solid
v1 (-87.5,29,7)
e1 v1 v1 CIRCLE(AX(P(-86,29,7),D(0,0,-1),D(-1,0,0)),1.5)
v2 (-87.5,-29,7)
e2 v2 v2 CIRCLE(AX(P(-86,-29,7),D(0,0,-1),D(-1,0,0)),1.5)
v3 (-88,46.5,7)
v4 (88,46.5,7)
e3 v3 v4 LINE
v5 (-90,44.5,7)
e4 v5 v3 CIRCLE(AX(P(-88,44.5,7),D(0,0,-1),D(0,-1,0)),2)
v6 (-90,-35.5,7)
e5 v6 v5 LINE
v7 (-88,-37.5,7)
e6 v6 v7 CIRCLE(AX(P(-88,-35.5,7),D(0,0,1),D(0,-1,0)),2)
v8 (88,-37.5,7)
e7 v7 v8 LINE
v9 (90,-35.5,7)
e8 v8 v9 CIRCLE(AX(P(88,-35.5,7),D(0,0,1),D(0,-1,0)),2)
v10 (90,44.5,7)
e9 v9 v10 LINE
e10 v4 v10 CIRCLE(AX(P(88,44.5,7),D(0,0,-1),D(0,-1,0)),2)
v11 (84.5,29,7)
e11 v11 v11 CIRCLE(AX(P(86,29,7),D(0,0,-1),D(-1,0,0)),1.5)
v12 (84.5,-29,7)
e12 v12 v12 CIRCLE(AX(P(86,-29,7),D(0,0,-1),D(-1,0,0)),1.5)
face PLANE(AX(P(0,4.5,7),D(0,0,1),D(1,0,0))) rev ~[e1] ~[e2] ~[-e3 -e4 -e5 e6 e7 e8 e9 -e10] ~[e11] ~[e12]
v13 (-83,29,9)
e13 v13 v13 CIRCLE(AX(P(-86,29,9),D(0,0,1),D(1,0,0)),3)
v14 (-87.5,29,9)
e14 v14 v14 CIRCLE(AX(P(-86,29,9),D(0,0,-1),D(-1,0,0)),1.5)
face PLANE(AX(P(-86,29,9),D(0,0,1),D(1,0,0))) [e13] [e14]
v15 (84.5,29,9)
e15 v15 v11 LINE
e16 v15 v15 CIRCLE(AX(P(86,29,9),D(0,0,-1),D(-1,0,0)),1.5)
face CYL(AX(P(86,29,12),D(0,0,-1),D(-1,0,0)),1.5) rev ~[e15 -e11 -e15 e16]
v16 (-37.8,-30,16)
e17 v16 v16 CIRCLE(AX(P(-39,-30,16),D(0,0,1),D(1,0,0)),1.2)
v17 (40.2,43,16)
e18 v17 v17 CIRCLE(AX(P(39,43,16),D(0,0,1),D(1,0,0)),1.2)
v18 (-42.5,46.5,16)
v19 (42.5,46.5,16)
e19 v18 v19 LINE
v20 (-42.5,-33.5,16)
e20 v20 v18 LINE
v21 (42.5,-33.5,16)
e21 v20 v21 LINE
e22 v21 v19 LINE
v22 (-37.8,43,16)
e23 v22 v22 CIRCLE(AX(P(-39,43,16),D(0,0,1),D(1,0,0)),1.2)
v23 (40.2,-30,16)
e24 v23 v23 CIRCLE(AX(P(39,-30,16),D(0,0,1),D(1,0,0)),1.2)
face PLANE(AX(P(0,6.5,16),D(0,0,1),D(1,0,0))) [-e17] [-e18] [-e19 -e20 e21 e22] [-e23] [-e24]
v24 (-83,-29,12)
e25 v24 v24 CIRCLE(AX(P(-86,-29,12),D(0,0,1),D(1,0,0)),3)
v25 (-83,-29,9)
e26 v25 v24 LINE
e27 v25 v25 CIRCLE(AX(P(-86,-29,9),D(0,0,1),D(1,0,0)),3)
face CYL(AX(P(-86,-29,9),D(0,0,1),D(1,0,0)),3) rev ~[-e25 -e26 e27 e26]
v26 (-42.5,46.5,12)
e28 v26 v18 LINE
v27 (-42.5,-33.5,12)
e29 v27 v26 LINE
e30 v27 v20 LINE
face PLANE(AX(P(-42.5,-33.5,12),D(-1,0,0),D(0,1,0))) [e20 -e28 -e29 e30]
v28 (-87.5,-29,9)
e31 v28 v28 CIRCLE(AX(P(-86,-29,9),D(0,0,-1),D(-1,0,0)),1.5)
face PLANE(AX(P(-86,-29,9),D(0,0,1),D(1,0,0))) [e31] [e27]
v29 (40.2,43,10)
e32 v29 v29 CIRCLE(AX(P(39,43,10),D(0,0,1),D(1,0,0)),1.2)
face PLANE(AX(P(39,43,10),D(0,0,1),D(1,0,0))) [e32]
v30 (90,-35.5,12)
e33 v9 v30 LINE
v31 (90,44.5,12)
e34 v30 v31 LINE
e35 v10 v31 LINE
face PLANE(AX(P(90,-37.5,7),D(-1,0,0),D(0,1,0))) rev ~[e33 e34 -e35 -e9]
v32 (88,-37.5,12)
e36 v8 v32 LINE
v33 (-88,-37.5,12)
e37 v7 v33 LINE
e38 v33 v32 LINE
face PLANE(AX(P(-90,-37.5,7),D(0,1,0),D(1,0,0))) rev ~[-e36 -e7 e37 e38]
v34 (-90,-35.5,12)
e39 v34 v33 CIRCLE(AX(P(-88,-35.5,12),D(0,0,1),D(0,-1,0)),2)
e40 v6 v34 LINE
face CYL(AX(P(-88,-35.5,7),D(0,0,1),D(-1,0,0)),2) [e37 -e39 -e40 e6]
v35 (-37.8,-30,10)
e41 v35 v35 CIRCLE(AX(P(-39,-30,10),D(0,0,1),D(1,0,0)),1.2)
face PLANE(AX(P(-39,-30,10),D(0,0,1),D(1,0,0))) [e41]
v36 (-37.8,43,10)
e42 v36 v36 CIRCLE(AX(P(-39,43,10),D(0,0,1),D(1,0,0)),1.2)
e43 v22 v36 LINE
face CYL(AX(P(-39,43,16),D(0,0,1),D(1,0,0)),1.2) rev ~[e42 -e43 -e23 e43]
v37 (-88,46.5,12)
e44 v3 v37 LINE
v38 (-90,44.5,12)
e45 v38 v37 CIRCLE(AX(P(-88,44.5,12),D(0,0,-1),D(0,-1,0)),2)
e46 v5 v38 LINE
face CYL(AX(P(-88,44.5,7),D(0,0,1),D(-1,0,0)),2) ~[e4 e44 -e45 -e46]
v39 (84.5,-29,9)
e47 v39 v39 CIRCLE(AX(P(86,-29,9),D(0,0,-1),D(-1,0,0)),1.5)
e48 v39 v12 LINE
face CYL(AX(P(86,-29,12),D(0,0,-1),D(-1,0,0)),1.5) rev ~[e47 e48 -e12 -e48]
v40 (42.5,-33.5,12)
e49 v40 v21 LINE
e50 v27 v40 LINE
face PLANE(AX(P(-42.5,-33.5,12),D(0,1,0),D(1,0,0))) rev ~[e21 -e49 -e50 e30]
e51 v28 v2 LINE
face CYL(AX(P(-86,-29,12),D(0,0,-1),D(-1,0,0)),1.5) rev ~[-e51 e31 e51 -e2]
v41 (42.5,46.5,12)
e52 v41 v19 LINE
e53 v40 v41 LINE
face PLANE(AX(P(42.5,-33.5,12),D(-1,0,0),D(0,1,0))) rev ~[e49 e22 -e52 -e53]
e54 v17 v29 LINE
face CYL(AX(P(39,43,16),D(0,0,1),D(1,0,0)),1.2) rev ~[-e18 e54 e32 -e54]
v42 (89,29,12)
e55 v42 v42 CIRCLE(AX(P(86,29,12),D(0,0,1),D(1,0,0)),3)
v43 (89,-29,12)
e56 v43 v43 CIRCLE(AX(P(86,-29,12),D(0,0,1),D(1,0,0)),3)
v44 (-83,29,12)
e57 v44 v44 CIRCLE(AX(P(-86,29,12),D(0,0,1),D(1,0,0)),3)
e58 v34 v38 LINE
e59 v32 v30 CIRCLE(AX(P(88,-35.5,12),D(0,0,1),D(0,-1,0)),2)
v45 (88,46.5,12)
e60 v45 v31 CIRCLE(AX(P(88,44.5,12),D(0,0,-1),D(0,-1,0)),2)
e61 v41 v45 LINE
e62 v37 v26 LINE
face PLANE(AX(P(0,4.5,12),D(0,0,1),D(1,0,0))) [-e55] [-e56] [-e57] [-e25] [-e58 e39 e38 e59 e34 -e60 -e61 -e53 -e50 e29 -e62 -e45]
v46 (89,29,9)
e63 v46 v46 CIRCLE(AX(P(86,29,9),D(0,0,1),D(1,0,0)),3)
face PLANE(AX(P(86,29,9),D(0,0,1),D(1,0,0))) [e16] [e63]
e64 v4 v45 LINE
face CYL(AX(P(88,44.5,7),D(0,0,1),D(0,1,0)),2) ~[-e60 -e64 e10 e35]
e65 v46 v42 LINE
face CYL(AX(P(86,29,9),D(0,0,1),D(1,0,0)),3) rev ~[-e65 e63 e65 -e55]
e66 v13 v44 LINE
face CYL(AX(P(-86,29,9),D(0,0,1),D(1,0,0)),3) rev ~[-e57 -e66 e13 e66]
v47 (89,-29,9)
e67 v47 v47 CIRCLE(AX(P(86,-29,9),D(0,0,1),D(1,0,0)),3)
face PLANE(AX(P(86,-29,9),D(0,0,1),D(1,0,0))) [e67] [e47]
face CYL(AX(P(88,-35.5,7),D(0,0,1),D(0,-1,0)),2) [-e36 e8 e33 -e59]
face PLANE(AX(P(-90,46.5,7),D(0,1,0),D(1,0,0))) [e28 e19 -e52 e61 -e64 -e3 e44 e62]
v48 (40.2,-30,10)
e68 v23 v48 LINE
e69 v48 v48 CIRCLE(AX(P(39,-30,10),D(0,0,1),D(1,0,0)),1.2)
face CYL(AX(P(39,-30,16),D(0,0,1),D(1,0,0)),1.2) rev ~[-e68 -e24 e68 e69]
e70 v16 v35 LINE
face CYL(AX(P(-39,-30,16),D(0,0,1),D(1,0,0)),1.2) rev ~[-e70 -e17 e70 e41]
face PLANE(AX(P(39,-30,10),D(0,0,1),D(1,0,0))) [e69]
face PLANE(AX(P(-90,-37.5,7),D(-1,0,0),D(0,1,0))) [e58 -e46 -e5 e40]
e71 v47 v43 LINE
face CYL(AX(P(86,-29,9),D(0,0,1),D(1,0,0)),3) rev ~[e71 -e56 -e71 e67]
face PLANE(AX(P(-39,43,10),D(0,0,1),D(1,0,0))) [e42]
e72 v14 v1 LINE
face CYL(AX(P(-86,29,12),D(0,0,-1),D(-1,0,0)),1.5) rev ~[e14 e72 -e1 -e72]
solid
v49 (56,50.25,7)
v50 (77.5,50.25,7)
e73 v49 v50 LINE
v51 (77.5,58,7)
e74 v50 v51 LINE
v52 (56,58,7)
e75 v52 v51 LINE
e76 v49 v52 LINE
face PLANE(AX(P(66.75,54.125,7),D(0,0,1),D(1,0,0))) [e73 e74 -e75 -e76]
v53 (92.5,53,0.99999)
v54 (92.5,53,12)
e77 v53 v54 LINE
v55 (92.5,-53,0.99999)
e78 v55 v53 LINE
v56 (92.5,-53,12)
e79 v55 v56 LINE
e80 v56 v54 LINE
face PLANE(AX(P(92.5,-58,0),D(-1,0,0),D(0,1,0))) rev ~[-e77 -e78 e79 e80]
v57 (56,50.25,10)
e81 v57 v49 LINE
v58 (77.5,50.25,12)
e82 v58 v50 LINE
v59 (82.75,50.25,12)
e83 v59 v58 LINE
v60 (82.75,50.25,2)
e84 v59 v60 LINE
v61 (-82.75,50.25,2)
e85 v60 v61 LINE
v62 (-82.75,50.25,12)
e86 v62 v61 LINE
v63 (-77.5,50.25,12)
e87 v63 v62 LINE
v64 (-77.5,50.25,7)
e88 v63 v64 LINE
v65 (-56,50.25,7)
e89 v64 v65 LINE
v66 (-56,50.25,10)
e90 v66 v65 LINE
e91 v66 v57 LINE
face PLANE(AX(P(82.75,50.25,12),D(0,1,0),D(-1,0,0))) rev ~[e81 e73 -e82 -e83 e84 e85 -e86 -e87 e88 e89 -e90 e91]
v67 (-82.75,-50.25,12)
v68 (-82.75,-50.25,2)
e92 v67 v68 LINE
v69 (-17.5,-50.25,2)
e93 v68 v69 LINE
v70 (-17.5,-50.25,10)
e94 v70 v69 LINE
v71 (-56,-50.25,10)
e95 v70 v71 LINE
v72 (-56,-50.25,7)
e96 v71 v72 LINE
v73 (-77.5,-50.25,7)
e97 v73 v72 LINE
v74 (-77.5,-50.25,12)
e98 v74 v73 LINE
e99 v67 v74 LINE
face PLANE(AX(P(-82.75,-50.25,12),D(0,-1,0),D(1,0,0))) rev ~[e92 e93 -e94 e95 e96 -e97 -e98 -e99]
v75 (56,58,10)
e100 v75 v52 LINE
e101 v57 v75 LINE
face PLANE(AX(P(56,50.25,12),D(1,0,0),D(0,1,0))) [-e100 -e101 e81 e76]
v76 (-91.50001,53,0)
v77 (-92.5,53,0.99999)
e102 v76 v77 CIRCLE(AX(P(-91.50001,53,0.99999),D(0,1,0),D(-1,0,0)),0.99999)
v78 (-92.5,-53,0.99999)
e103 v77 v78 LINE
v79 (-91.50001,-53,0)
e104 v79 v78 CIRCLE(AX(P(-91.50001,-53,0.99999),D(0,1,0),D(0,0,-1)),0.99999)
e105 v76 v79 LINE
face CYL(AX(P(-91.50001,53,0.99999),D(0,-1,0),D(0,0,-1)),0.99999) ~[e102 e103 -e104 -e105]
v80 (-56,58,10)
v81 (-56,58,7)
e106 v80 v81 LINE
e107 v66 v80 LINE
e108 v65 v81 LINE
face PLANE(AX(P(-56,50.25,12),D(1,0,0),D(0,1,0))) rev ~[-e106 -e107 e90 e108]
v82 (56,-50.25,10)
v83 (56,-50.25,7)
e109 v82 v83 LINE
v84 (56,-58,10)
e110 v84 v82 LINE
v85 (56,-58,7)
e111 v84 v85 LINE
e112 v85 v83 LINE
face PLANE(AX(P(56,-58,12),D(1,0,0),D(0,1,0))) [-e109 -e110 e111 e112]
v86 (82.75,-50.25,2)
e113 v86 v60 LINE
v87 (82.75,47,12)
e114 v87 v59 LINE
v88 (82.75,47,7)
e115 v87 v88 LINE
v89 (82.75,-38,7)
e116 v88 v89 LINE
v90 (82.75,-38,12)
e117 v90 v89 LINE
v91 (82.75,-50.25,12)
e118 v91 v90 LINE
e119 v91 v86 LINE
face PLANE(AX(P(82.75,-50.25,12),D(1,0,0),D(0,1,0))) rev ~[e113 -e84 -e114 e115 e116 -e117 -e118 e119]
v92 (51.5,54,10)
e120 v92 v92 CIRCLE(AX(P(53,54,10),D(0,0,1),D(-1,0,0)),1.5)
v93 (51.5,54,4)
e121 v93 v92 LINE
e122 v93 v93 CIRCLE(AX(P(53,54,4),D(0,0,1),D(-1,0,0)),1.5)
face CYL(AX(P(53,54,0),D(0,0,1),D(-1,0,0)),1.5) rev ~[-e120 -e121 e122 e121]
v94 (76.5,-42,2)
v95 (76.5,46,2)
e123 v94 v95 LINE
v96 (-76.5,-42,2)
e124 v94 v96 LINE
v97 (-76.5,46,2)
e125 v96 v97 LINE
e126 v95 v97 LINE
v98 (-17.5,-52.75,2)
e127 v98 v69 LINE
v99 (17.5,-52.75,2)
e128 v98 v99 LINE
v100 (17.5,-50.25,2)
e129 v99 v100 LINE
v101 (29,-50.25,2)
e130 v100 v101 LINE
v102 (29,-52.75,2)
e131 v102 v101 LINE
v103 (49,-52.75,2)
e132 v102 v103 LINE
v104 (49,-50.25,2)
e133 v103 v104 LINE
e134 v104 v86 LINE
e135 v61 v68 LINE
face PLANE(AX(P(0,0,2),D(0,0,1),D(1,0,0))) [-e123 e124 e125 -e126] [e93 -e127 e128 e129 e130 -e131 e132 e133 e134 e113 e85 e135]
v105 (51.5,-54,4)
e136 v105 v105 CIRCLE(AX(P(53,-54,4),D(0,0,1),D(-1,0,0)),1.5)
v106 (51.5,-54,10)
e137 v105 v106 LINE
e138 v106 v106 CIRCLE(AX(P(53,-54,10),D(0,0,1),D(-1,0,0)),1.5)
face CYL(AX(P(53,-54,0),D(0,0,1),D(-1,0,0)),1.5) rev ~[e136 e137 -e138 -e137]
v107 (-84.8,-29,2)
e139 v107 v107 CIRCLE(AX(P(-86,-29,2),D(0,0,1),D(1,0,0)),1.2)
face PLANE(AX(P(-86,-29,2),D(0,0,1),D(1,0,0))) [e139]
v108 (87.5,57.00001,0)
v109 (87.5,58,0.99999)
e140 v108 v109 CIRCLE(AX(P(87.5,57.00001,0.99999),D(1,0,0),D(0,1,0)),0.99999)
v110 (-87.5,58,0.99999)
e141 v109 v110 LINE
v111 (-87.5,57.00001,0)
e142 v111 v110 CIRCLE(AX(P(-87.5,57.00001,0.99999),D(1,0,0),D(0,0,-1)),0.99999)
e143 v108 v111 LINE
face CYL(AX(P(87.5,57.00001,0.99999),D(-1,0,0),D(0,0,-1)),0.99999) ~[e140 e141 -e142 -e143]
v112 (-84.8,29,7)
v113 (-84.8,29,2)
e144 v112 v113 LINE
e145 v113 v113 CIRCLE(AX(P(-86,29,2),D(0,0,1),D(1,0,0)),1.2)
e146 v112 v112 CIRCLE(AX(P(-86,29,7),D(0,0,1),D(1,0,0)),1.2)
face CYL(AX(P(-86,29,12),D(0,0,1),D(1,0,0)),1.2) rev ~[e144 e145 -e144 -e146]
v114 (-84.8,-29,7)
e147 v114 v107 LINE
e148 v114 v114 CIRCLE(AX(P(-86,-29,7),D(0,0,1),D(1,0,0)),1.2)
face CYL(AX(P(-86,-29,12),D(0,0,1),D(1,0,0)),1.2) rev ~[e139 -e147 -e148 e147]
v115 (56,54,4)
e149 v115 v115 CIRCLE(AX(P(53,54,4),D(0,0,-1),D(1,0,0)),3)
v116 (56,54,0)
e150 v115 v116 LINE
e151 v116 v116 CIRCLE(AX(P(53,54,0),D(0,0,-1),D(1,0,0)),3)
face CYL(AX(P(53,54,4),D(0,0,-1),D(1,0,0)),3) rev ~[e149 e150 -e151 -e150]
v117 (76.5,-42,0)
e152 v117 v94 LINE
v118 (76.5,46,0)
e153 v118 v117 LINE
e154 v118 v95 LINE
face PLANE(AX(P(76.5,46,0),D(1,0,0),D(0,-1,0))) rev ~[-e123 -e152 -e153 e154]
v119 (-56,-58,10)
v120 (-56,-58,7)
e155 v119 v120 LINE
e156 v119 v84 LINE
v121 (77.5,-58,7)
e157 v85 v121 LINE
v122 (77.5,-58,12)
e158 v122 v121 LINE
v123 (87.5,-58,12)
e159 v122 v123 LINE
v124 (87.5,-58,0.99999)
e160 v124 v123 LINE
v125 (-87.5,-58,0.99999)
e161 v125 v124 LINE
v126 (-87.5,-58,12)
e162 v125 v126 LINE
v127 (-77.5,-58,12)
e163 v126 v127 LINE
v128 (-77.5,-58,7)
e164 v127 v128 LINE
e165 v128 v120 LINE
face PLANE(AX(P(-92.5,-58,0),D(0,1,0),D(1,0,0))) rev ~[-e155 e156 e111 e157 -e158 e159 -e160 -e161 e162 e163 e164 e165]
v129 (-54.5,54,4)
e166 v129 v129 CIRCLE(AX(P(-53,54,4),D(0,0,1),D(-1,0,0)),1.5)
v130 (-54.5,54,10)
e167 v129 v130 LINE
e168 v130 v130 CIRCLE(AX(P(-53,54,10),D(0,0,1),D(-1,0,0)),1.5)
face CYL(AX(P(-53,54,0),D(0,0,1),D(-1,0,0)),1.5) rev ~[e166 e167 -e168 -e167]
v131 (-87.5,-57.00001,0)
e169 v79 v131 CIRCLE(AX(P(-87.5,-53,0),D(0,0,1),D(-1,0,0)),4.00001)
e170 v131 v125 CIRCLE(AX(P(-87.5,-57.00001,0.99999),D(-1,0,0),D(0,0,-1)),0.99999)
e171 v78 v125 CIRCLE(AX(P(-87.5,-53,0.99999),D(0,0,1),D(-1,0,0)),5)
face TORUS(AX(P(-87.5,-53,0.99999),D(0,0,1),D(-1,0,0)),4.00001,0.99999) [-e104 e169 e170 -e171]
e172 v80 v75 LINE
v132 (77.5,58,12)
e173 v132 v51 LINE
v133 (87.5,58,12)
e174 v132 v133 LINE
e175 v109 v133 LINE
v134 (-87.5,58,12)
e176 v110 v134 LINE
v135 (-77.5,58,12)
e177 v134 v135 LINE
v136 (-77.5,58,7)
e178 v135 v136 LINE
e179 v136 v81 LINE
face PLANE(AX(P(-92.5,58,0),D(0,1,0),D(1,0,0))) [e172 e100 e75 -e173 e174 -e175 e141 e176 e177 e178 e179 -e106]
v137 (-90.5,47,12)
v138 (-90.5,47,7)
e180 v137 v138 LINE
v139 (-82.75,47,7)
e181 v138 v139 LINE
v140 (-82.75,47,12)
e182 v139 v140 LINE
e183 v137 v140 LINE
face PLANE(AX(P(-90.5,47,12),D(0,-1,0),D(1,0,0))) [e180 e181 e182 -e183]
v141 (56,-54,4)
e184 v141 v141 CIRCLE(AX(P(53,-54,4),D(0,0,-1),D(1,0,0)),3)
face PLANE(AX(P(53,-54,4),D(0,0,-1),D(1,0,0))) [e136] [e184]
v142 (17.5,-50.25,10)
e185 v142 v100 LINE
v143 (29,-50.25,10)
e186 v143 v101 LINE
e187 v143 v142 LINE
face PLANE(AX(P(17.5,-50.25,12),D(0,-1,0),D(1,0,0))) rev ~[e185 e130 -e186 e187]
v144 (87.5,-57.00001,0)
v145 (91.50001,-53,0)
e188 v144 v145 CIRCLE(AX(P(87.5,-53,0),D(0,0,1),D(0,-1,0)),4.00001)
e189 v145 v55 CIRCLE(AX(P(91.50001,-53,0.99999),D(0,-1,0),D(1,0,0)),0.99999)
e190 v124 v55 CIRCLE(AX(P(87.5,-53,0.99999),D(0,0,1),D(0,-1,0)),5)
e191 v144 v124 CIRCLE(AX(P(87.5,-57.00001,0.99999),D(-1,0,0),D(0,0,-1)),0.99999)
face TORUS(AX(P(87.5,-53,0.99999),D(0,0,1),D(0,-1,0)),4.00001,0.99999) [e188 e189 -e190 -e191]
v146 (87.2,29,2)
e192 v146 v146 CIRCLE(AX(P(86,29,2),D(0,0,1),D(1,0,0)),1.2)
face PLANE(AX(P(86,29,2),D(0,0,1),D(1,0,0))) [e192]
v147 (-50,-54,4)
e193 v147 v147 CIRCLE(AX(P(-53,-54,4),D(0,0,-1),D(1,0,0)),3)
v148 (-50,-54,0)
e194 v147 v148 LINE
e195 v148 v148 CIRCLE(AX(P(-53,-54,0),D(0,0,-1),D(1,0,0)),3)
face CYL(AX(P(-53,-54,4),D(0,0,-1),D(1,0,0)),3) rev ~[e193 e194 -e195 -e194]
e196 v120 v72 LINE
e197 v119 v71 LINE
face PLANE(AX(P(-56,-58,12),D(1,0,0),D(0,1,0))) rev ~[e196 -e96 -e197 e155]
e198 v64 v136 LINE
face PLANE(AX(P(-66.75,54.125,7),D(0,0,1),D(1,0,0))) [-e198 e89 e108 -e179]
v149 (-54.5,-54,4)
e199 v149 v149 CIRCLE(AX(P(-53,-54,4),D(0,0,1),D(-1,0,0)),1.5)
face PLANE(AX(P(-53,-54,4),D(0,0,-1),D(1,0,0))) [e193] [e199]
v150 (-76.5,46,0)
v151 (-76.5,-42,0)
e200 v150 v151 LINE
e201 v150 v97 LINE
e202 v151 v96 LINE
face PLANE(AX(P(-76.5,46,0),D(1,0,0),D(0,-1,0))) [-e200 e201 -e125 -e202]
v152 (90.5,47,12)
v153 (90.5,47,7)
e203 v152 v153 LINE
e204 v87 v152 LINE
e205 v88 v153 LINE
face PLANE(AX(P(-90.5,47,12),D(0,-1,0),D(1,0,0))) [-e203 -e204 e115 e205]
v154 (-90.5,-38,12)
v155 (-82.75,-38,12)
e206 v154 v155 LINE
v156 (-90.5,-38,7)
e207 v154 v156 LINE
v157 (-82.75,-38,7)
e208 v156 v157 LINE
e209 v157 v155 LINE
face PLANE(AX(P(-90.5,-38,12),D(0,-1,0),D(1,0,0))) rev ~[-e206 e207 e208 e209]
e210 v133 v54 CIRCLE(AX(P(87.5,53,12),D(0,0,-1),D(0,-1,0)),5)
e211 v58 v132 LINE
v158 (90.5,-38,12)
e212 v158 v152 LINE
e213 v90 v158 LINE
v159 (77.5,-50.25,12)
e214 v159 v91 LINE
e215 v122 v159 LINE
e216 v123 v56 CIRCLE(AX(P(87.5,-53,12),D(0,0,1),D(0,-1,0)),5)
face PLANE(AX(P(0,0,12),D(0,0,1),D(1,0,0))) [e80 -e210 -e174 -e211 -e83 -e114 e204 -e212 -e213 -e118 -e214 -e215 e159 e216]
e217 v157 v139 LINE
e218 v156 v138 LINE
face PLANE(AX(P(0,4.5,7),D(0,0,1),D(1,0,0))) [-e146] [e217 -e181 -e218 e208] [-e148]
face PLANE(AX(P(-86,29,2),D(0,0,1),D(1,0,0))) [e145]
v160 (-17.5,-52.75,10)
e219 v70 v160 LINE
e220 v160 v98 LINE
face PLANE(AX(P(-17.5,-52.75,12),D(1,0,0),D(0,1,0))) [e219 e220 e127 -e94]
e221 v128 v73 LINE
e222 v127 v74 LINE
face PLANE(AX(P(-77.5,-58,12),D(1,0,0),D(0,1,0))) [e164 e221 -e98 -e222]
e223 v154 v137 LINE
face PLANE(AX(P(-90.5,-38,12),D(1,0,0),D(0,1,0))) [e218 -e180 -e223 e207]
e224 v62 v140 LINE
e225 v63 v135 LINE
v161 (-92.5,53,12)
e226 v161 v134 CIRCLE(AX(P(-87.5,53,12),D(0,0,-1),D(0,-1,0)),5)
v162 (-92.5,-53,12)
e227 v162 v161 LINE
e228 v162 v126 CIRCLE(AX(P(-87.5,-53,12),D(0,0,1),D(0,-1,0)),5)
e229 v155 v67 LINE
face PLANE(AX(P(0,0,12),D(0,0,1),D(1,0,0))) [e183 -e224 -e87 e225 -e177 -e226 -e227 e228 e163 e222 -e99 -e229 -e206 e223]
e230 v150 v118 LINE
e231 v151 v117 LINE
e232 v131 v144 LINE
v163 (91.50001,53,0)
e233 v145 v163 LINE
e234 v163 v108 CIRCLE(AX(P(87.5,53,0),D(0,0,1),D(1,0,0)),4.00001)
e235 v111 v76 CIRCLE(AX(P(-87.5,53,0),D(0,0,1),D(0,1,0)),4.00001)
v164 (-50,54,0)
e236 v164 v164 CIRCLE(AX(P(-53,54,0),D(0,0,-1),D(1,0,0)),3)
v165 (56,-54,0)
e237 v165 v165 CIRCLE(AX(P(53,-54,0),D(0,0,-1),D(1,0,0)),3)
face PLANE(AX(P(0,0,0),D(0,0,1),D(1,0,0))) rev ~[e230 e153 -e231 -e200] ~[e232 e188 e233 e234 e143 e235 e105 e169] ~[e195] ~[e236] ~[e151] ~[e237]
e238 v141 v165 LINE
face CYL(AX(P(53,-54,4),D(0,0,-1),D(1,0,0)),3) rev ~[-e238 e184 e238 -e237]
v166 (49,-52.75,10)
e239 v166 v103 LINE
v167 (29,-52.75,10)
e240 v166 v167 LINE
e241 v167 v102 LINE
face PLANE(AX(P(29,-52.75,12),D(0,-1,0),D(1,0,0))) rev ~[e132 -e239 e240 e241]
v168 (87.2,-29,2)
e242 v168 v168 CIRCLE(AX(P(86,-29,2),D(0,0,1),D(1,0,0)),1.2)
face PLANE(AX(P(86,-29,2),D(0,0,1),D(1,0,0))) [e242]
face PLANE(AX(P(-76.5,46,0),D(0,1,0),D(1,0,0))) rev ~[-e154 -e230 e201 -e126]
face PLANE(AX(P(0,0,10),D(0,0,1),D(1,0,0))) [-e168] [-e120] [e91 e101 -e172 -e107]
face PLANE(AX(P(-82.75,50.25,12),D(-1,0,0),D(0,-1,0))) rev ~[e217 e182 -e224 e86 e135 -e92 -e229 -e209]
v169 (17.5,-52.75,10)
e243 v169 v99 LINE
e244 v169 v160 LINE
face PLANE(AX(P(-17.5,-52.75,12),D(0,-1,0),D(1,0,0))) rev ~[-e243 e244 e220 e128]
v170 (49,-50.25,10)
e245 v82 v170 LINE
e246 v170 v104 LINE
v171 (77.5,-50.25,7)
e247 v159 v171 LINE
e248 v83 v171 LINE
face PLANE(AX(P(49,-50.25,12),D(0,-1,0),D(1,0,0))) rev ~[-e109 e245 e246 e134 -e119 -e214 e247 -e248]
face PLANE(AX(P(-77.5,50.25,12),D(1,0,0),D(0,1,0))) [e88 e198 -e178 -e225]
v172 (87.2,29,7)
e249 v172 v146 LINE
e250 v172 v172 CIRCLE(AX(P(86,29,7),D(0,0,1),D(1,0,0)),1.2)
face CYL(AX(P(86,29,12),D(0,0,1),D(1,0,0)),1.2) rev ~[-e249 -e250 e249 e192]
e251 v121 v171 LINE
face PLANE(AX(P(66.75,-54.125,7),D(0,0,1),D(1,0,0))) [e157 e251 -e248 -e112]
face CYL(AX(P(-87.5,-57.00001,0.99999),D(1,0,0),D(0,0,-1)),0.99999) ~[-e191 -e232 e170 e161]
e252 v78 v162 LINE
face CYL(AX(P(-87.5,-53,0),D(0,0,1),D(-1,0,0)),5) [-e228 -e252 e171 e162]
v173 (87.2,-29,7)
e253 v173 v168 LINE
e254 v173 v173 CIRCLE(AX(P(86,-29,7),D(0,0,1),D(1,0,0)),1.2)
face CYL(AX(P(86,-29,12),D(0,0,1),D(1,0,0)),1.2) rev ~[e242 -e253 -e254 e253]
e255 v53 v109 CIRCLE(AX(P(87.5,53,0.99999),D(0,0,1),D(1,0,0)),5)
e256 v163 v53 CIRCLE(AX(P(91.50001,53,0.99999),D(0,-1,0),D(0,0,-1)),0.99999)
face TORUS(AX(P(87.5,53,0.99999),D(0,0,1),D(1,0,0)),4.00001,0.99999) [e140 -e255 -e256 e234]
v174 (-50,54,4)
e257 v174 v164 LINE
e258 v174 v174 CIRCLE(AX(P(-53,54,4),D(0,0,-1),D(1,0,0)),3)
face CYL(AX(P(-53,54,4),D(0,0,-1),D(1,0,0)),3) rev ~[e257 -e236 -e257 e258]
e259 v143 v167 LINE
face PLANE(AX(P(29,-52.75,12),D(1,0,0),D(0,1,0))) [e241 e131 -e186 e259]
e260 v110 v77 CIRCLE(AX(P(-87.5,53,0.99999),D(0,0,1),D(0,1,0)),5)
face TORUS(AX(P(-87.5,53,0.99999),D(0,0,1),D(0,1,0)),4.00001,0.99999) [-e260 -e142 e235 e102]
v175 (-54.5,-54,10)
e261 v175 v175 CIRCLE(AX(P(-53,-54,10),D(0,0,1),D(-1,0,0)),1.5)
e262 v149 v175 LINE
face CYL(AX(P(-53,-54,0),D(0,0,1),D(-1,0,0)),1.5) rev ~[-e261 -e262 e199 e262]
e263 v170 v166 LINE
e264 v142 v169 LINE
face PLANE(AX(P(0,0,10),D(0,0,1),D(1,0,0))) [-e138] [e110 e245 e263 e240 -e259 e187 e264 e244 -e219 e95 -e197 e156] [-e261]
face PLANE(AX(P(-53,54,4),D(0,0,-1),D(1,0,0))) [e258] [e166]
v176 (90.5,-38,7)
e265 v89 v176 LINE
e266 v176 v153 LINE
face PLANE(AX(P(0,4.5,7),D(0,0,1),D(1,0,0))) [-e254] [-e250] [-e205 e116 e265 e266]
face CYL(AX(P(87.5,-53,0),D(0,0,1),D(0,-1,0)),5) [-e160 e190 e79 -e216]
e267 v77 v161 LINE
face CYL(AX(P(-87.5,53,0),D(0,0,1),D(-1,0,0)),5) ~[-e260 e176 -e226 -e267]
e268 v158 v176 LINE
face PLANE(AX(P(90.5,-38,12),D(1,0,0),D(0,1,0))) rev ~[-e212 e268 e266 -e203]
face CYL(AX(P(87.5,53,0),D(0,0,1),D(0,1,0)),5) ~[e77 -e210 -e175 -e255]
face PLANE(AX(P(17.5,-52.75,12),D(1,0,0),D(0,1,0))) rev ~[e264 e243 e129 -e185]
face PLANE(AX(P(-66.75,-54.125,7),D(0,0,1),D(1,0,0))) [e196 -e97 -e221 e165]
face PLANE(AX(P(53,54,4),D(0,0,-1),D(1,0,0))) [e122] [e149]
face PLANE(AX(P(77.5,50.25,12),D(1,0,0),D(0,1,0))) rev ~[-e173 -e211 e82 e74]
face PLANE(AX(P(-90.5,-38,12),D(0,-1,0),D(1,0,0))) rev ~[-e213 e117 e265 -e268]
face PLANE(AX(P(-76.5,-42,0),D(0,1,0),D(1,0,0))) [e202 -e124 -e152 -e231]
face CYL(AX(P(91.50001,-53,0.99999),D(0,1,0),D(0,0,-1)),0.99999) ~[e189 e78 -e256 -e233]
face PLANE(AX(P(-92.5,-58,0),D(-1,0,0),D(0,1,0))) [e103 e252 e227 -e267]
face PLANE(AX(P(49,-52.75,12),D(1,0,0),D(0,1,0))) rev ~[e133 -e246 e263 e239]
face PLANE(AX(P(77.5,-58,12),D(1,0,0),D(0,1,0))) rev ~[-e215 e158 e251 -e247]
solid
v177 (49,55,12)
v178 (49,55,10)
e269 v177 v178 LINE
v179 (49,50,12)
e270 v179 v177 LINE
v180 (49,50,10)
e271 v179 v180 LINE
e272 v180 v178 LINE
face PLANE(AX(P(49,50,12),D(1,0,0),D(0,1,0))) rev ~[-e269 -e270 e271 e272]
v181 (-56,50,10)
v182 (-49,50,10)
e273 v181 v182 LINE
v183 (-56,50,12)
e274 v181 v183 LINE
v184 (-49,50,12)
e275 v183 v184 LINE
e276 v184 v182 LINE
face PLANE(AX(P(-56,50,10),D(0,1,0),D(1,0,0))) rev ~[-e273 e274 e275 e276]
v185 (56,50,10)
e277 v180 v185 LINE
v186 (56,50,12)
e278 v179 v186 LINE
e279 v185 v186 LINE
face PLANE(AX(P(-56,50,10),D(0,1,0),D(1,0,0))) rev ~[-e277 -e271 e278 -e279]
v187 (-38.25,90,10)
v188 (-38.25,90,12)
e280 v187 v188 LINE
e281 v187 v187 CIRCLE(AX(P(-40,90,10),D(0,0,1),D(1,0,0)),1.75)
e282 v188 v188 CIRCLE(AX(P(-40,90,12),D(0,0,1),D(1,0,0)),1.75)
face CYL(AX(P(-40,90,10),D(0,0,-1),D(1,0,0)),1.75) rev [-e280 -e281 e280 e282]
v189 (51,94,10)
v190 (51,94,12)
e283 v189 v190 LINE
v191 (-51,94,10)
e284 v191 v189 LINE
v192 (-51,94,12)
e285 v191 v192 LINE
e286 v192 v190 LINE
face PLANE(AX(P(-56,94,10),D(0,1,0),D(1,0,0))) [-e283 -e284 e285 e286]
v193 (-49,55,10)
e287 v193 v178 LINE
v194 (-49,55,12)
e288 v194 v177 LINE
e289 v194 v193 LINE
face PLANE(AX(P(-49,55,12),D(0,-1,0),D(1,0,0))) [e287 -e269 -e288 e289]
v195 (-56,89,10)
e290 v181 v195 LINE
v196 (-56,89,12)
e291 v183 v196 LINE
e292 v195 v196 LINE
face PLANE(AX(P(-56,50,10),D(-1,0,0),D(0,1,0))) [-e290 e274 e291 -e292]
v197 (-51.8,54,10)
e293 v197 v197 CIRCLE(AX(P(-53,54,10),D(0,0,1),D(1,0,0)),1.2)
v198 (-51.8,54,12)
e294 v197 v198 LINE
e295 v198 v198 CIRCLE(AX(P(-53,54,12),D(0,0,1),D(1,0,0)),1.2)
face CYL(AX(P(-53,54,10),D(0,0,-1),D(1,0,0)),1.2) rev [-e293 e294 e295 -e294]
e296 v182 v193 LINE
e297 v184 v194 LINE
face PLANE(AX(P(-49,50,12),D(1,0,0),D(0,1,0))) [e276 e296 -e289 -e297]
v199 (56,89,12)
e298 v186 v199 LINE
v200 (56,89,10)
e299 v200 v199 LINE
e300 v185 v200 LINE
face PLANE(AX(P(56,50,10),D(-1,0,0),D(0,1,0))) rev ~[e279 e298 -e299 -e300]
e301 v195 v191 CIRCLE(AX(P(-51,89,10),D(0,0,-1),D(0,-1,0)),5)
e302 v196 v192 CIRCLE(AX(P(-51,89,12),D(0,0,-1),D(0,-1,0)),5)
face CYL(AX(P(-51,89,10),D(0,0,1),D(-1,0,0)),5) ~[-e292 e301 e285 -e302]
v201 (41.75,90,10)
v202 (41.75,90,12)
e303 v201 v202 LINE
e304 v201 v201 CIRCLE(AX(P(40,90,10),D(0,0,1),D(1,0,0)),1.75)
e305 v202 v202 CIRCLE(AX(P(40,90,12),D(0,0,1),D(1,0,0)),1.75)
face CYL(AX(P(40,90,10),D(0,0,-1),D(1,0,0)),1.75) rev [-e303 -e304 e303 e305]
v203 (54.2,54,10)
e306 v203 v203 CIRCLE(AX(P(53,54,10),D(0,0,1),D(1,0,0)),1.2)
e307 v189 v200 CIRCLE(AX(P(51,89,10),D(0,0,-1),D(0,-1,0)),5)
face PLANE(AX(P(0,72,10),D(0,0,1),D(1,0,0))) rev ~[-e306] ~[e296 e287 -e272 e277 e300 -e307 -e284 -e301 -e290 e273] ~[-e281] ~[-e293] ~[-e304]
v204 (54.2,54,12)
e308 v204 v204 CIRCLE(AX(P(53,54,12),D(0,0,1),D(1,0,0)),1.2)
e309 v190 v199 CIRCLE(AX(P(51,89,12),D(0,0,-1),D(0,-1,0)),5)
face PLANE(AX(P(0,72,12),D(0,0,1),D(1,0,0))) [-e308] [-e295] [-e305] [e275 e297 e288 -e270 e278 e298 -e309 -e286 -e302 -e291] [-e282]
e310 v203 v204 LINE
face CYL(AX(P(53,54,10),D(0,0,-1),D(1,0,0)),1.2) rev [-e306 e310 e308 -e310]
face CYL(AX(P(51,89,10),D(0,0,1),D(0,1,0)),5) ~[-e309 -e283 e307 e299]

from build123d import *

# Parameters (mm, degrees)
F0_W            = 185
F0_H            = 116
F1_DEPTH        = 12
F2_W            = 20
F2_H            = 2.5
F2_W_2          = 35
F3_DEPTH        = 10
F4_W            = 153
F4_H            = 88
F5_DEPTH        = 25
F6_W            = 181
F6_H            = 85
F7_DEPTH        = 5
F8_W            = 180
F8_H            = 84
F9_DEPTH        = 5
F10_R           = 5
F12_D           = 3
F12_DEPTH       = 20
F12_CBORE_D     = 6
F12_CBORE_DEPTH = 3
F12_TIP         = 0.9012909285
F11_R           = 1.2
F13_DEPTH       = 10
F15_W           = 112
F15_H           = 116
F16_DEPTH       = 2
F18_D           = 3
F18_DEPTH       = 30
F18_CBORE_D     = 6
F18_CBORE_DEPTH = 4
F18_TIP         = 0.9012909285
F19_W           = 21.5
F19_H           = 7.75
F20_DEPTH       = 5
F21_W           = 112
F21_H           = 44
F21_R           = 1.2
F21_R_2         = 1.75
F22_DEPTH       = 2
F23_R           = 5
F24_W           = 85
F24_H           = 80
F25_DEPTH       = 4
F26_R           = 1.2
F27_DEPTH       = 6
F28_R           = 2
F29_W           = 98
F29_H           = 5
F30_DEPTH       = 2
F31_R           = 0.99999


# Not quite as in the source:
# - a fillet or chamfer is up to 0.001 mm smaller than in the source, because OpenCascade refuses the exact size


with BuildPart() as f1:
    # F0 (on Top) → F1 (new body)
    with BuildSketch(Plane.XY):
        Rectangle(F0_W, F0_H)
    extrude(amount=F1_DEPTH)

    # F2 (on face) → F3 (cut)
    with BuildSketch(Plane.XY.offset(12)):
        Polygon((49, -50.25), (82.75, -50.25), (82.75, 50.25), (-82.75, 50.25), (-82.75, -50.25), (-17.5, -50.25), (17.5, -50.25), (29, -50.25), align=None)
        with Locations((39, -51.5)):
            Rectangle(F2_W, F2_H)
        with Locations((0, -51.5)):
            Rectangle(F2_W_2, F2_H)
    extrude(amount=-F3_DEPTH, mode=Mode.SUBTRACT)

    # F4 (on face) → F5 (cut)
    with BuildSketch(Plane(origin=(0, 0, 0), x_dir=(1, 0, 0), z_dir=(0, 0, -1))):
        with Locations((0, -2)):
            Rectangle(F4_W, F4_H)
    extrude(amount=-F5_DEPTH, mode=Mode.SUBTRACT)

    # F6 (on face) → F7 (cut)
    with BuildSketch(Plane.XY.offset(12)):
        with Locations((0, 4.5)):
            Rectangle(F6_W, F6_H)
    extrude(amount=-F7_DEPTH, mode=Mode.SUBTRACT)

    # F10
    f10_edges = [f1.edges().sort_by_distance(p)[0] for p in [
        (-92.5, 58, 6),
        (92.5, 58, 6),
        (92.5, -58, 6),
        (-92.5, -58, 6),
    ]]
    fillet(f10_edges, radius=F10_R)

    # F11 (on face) → F13 (cut)
    with BuildSketch(Plane.XY.offset(12)):
        with Locations((-86, 29)):
            Circle(F11_R)
        with Locations((-86, -29)):
            Circle(F11_R)
        with Locations((86, -29)):
            Circle(F11_R)
        with Locations((86, 29)):
            Circle(F11_R)
    extrude(amount=-F13_DEPTH, mode=Mode.SUBTRACT)

    # F15 (on face) → F16 (cut)
    with BuildSketch(Plane.XY.offset(12)):
        Rectangle(F15_W, F15_H)
    extrude(amount=-F16_DEPTH, mode=Mode.SUBTRACT)

    # F18
    with Locations(Plane(origin=(0, 0, 0), x_dir=(1, 0, 0), z_dir=(0, 0, -1))):
        with Locations((-53, 54), (-53, -54), (53, 54), (53, -54)):
            CounterBoreHole(F18_D / 2, F18_CBORE_D / 2, F18_CBORE_DEPTH, depth=F18_DEPTH)
            with Locations((0, 0, -(F18_DEPTH + F18_TIP / 2))):  # 118° drill point
                Cone(0, F18_D / 2, F18_TIP, mode=Mode.SUBTRACT)

    # F19 (on face) → F20 (cut)
    with BuildSketch(Plane.XY.offset(12)):
        with Locations((-66.75, 54.125)):
            Rectangle(F19_W, F19_H)
        with Locations((-66.75, -54.125)):
            Rectangle(F19_W, F19_H)
        with Locations((66.75, 54.125)):
            Rectangle(F19_W, F19_H)
        with Locations((66.75, -54.125)):
            Rectangle(F19_W, F19_H)
    extrude(amount=-F20_DEPTH, mode=Mode.SUBTRACT)

    # F31 (radius 1 in the source; OpenCascade refuses exactly that, so slightly less here)
    f31_edges = [f1.edges().sort_by_distance(p)[0] for p in [
        (0, -58, 0),
        (-91.035534, -56.535534, 0),
        (91.035534, -56.535534, 0),
        (-92.5, 0, 0),
        (92.5, 0, 0),
        (-91.035534, 56.535534, 0),
        (91.035534, 56.535534, 0),
        (0, 58, 0),
    ]]
    fillet(f31_edges, radius=F31_R)


with BuildPart() as f9:
    # F8 (on face) → F9 (new body)
    with BuildSketch(Plane.XY.offset(7)):
        with Locations((0, 4.5)):
            Rectangle(F8_W, F8_H)
    extrude(amount=F9_DEPTH)

    # F12
    with Locations(Plane.XY.offset(12)):
        with Locations((-86, 29), (-86, -29), (86, 29), (86, -29)):
            CounterBoreHole(F12_D / 2, F12_CBORE_D / 2, F12_CBORE_DEPTH, depth=F12_DEPTH)
            with Locations((0, 0, -(F12_DEPTH + F12_TIP / 2))):  # 118° drill point
                Cone(0, F12_D / 2, F12_TIP, mode=Mode.SUBTRACT)

    # F24 (on face) → F25 (join)
    with BuildSketch(Plane.XY.offset(12)):
        with Locations((0, 6.5)):
            Rectangle(F24_W, F24_H)
    extrude(amount=F25_DEPTH)

    # F26 (on face) → F27 (cut)
    with BuildSketch(Plane.XY.offset(16)):
        with Locations((-39, 43)):
            Circle(F26_R)
        with Locations((39, 43)):
            Circle(F26_R)
        with Locations((-39, -30)):
            Circle(F26_R)
        with Locations((39, -30)):
            Circle(F26_R)
    extrude(amount=-F27_DEPTH, mode=Mode.SUBTRACT)

    # F28
    f28_edges = [f9.edges().sort_by_distance(p)[0] for p in [
        (-90, 46.5, 9.5),
        (-90, -37.5, 9.5),
        (90, -37.5, 9.5),
        (90, 46.5, 9.5),
    ]]
    fillet(f28_edges, radius=F28_R)


with BuildPart() as f22:
    # F21 (on face) → F22 (new body)
    with BuildSketch(Plane.XY.offset(10)):
        with Locations((0, 72)):
            Rectangle(F21_W, F21_H)
        with Locations((-53, 54)):
            Circle(F21_R, mode=Mode.SUBTRACT)
        with Locations((53, 54)):
            Circle(F21_R, mode=Mode.SUBTRACT)
        with Locations((-40, 90)):
            Circle(F21_R_2, mode=Mode.SUBTRACT)
        with Locations((40, 90)):
            Circle(F21_R_2, mode=Mode.SUBTRACT)
    extrude(amount=F22_DEPTH)

    # F23
    f23_edges = [f22.edges().sort_by_distance(p)[0] for p in [
        (-56, 94, 11),
        (56, 94, 11),
    ]]
    fillet(f23_edges, radius=F23_R)

    # F29 (on face) → F30 (cut)
    with BuildSketch(Plane.XY.offset(12)):
        with Locations((0, 52.5)):
            Rectangle(F29_W, F29_H)
    extrude(amount=-F30_DEPTH, mode=Mode.SUBTRACT)


solid = Compound([f1.part, f9.part, f22.part])
